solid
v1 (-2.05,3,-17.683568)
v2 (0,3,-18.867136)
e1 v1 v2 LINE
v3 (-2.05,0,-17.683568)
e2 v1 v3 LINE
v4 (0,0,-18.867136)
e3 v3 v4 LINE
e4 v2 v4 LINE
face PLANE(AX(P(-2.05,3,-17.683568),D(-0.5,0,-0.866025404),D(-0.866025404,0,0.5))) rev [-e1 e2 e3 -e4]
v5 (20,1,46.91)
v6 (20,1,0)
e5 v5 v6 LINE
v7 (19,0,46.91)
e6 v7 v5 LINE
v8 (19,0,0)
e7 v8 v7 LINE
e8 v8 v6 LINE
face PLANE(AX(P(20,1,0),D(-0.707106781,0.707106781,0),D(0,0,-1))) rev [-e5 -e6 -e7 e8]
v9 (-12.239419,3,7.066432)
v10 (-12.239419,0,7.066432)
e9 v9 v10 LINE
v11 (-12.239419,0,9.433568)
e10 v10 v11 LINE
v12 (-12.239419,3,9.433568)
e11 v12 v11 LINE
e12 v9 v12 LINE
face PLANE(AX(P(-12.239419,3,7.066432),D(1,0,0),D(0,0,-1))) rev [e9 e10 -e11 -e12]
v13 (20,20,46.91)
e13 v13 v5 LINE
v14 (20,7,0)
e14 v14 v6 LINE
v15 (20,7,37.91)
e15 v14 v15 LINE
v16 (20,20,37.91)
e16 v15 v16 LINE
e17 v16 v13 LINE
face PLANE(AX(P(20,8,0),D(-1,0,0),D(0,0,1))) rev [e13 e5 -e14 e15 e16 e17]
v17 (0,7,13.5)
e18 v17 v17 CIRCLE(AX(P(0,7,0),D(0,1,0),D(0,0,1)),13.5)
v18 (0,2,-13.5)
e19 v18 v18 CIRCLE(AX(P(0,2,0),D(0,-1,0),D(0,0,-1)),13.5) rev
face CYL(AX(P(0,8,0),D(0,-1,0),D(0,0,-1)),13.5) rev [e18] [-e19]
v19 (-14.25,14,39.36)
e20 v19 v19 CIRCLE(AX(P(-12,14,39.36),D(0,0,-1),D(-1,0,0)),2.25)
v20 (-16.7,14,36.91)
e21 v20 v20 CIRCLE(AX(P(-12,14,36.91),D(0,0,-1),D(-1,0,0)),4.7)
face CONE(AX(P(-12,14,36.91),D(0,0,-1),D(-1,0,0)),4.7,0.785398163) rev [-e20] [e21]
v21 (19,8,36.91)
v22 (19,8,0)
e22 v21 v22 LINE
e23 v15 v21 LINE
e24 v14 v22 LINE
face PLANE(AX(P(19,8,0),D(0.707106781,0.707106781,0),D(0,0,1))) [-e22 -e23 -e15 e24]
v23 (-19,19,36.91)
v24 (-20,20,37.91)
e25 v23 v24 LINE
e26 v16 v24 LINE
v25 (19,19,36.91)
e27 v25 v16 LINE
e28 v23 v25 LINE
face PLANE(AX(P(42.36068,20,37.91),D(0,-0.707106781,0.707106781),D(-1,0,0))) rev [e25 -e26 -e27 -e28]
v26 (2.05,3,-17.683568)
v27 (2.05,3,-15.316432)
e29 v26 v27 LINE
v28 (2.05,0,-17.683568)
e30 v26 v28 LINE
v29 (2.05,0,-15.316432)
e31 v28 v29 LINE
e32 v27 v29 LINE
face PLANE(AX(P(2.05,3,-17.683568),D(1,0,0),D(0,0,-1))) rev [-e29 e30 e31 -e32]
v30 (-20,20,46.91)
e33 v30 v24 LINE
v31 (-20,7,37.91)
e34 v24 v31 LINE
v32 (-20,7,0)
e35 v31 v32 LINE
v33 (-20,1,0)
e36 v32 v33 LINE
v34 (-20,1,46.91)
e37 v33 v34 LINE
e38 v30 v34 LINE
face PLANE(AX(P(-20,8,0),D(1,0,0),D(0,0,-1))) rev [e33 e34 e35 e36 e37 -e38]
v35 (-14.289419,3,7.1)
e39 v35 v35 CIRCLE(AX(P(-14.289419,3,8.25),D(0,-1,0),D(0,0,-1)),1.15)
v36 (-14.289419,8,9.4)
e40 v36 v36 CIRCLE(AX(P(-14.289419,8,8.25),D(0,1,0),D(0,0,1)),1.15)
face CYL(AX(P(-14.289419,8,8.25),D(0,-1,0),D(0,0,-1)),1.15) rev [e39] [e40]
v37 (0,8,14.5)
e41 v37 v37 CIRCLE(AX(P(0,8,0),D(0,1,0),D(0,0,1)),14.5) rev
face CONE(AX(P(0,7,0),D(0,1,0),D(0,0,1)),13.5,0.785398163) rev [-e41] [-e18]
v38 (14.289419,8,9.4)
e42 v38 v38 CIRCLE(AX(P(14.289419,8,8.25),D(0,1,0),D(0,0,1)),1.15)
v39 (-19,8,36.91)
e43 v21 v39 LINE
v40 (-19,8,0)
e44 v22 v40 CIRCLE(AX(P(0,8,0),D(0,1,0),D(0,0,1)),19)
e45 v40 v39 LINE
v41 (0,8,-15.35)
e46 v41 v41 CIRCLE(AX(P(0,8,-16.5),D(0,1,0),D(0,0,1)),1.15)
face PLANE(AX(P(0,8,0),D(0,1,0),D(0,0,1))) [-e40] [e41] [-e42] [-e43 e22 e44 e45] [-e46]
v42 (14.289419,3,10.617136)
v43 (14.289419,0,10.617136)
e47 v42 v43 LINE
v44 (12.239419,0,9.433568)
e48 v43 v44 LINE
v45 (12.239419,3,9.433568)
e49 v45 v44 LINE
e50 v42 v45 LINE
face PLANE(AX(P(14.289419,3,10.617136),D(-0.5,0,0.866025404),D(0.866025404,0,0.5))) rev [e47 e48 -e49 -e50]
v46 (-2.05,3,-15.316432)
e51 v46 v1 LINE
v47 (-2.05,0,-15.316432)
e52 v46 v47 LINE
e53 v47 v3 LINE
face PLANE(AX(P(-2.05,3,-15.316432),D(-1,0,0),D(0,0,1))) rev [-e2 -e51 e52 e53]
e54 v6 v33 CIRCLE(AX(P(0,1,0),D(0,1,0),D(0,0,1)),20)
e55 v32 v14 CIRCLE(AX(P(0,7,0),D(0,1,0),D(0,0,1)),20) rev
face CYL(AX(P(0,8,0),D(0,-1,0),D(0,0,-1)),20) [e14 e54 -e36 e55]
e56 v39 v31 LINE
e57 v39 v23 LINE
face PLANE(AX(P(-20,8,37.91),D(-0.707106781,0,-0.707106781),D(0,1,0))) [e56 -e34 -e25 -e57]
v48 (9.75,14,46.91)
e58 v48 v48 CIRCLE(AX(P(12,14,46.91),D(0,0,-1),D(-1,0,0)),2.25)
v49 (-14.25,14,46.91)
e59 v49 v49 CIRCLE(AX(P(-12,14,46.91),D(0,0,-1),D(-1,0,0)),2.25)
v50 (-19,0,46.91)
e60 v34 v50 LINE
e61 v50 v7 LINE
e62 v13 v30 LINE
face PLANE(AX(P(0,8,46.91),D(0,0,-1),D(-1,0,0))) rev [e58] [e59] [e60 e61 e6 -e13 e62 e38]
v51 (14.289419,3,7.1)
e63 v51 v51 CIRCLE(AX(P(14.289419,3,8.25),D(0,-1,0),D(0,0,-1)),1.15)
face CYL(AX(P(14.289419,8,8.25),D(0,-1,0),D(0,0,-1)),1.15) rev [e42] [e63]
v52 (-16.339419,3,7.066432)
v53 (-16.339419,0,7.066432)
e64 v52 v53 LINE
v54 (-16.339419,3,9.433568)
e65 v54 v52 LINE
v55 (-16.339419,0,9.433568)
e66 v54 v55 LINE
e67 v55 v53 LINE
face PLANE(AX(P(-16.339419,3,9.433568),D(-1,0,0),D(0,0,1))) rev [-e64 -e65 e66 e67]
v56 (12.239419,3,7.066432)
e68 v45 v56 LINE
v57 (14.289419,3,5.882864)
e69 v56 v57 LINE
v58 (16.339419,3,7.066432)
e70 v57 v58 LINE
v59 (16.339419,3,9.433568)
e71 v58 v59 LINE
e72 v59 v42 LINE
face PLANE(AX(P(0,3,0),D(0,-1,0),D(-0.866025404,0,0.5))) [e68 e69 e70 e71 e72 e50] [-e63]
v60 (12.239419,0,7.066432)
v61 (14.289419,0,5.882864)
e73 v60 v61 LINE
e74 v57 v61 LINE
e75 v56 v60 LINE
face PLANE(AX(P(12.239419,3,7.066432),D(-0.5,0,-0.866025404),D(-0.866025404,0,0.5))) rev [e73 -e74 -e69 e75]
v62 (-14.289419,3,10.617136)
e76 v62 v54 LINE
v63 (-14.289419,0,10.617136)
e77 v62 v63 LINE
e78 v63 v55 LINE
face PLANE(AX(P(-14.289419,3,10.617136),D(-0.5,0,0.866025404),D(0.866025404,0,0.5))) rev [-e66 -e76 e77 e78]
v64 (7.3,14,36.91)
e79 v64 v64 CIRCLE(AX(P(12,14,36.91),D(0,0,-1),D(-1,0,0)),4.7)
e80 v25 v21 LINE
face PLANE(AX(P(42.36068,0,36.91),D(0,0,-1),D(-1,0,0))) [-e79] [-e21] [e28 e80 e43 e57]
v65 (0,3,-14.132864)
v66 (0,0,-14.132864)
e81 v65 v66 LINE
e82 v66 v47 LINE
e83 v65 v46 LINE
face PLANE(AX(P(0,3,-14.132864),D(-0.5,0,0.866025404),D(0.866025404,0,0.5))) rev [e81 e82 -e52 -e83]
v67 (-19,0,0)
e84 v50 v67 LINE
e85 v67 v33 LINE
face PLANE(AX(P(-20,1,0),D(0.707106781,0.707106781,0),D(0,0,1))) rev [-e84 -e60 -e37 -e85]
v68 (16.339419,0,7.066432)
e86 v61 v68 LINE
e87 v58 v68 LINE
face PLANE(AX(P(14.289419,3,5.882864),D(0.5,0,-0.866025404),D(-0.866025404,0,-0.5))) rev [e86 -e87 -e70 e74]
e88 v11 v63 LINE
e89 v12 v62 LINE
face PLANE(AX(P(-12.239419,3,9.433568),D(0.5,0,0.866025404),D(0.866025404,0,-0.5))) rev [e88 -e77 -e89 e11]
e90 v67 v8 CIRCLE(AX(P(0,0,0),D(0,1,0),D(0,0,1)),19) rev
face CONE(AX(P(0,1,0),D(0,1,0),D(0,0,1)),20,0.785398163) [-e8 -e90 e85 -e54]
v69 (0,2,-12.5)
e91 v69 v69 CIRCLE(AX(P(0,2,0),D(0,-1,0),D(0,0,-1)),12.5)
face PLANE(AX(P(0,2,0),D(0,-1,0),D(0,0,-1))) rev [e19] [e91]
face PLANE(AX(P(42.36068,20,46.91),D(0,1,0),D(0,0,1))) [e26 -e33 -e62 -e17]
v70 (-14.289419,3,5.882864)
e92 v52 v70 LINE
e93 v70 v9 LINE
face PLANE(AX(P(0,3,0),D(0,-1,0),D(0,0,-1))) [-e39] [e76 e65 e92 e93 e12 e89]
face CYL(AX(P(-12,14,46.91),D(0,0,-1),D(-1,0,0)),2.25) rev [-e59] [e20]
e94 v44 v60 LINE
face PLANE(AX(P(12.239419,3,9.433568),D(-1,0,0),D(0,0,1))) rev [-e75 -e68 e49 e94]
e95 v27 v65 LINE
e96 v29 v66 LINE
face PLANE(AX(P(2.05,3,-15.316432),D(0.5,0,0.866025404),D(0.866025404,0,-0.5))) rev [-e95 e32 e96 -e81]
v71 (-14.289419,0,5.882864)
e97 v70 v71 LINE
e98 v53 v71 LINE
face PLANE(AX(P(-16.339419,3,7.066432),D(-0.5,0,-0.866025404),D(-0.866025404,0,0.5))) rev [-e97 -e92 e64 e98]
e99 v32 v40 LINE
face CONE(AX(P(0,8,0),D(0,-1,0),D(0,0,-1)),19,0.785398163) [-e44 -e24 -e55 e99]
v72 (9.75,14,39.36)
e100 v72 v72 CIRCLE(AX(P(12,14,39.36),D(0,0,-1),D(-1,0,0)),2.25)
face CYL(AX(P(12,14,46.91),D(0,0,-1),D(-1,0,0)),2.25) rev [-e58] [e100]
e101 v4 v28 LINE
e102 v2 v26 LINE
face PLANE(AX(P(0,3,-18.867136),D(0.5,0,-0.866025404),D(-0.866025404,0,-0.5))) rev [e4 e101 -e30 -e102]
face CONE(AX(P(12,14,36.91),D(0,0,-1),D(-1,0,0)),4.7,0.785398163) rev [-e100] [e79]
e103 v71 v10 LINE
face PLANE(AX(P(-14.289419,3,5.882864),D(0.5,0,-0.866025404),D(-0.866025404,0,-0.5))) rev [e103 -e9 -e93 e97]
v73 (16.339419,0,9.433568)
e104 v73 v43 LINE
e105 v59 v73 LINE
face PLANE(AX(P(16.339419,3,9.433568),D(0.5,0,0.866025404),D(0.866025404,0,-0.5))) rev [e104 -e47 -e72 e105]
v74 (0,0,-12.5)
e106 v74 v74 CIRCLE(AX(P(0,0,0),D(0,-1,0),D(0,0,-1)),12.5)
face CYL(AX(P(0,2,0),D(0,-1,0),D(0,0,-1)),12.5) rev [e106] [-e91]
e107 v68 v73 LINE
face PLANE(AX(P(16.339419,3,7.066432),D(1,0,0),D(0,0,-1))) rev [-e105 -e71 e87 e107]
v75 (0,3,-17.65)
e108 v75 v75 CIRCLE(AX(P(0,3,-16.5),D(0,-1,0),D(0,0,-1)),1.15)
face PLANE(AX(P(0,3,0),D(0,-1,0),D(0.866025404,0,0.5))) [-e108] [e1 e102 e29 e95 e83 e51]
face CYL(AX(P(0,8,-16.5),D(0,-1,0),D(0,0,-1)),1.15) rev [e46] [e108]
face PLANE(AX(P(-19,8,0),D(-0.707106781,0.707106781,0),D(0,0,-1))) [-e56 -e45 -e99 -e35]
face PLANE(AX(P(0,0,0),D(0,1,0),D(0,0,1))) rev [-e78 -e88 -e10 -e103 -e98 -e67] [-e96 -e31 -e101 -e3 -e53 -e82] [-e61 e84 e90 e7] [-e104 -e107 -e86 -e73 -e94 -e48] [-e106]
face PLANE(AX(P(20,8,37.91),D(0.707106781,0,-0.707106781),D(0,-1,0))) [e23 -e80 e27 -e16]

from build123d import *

# Parameters (mm, degrees)
ESQUISSE1_R                  = 1.15
ESQUISSE1_R_2                = 13.5
BOSS_EXTRU_1_DEPTH           = 8
ESQUISSE2_R                  = 13.5
ESQUISSE2_R_2                = 12.5
BOSS_EXTRU_2_DEPTH           = 2
ENL_V_MAT_EXTRU_1_DEPTH      = 3
R_P_TITION_CIRCULAIRE1_COUNT = 3
ESQUISSE4_W                  = 10
ESQUISSE4_H                  = 20
BOSS_EXTRU_3_DEPTH           = 40
PER_AGEAVANC_1_OUTLINE_R     = 2.25
PER_AGEAVANC_1_DEPTH         = 2.45
PER_AGEAVANC_1_DRAFT         = 45
PER_AGEAVANC_1_2_OUTLINE_R   = 2.25
PER_AGEAVANC_1_2_DEPTH       = 2.45
PER_AGEAVANC_1_2_DRAFT       = 45
ESQUISSE7_R                  = 2.25
ENL_V_MAT_EXTRU_2_DEPTH      = 66.754160325
CHANFREIN1_SIZE              = 1


# Read off the part's stored shape, not the designer's step: PerçageAvancé1
with BuildPart() as part:
    # Esquisse1 → Boss.-Extru.1 (new body)
    with BuildSketch(Plane(origin=(0, 0, 0), x_dir=(1, 0, 0), z_dir=(0, 1, 0))):
        with BuildLine():
            Line((20, -46.91), (20, 0))
            ThreePointArc((20, 0), (0, 20), (-20, 0))
            Line((-20, 0), (-20, -46.91))
            Line((-20, -46.91), (20, -46.91))
        make_face()
        with Locations(Location((0, 16.5, 0), (0, 0, 270))):
            Circle(ESQUISSE1_R, mode=Mode.SUBTRACT)
        with Locations(Location((-14.289419162, -8.25, 0), (0, 0, 270))):
            Circle(ESQUISSE1_R, mode=Mode.SUBTRACT)
        with Locations(Location((0, 0, 0), (0, 0, 270))):
            Circle(ESQUISSE1_R_2, mode=Mode.SUBTRACT)
        with Locations(Location((14.289419162, -8.25, 0), (0, 0, 270))):
            Circle(ESQUISSE1_R, mode=Mode.SUBTRACT)
    extrude(amount=BOSS_EXTRU_1_DEPTH)

    # Esquisse2 → Boss.-Extru.2 (add)
    with BuildSketch(Plane.XZ):
        with Locations(Location((0, 0, 0), (0, 0, 270))):
            Circle(ESQUISSE2_R)
        with Locations(Location((0, 0, 0), (0, 0, 270))):
            Circle(ESQUISSE2_R_2, mode=Mode.SUBTRACT)
    extrude(amount=-BOSS_EXTRU_2_DEPTH)

    # Esquisse3 → Enlèv. mat.-Extru.1 (cut)
    with BuildSketch(Plane.XZ):
        Polygon((-14.289419162, 5.882863896), (-12.239419162, 7.066431948), (-12.239419162, 9.433568052), (-14.289419162, 10.617136104), (-16.339419162, 9.433568052), (-16.339419162, 7.066431948), align=None)
    enl_v_mat_extru_1 = extrude(amount=-ENL_V_MAT_EXTRU_1_DEPTH, mode=Mode.SUBTRACT)

    # Répétition circulaire1: Enlèv. mat.-Extru.1 ×3 about axis
    r_p_tition_circulaire1_axis = Axis((0, 0, 0), (0, 1, 0))
    for i in range(1, R_P_TITION_CIRCULAIRE1_COUNT):
        add(enl_v_mat_extru_1.rotate(r_p_tition_circulaire1_axis, i * 360 / R_P_TITION_CIRCULAIRE1_COUNT), mode=Mode.SUBTRACT)

    # Esquisse4 → Boss.-Extru.3 (add)
    with BuildSketch(Plane.ZY.offset(20)):
        with Locations((41.91, 10)):
            Rectangle(ESQUISSE4_W, ESQUISSE4_H)
    extrude(amount=-BOSS_EXTRU_3_DEPTH)


with BuildPart() as per_ageavanc_1_tool:
    # PerçageAvancé1 outline → PerçageAvancé1 (with draft: the straight prism first)
    with BuildSketch(Plane.XY.offset(39.36)):
        with Locations((-12, 14)):
            Circle(PER_AGEAVANC_1_OUTLINE_R)
    extrude(amount=-PER_AGEAVANC_1_DEPTH)
    # PerçageAvancé1: the draft: its side faces are tilted about the plane it starts from
    per_ageavanc_1_sides = [per_ageavanc_1_tool.faces().sort_by_distance(p)[0] for p in [
        (-14.25, 14, 38.135),
    ]]
    draft(per_ageavanc_1_sides, Plane.XY.offset(39.36), PER_AGEAVANC_1_DRAFT)


with BuildPart() as part_1:
    add(part.part)

    # PerçageAvancé1: cut by per_ageavanc_1_tool
    add(per_ageavanc_1_tool.part, mode=Mode.SUBTRACT)


with BuildPart() as per_ageavanc_1_2_tool:
    # Per_ageAvanc_1 2 outline → Per_ageAvanc_1 2 (with draft: the straight prism first)
    with BuildSketch(Plane.XY.offset(39.36)):
        with Locations((12, 14)):
            Circle(PER_AGEAVANC_1_2_OUTLINE_R)
    extrude(amount=-PER_AGEAVANC_1_2_DEPTH)
    # Per_ageAvanc_1 2: the draft: its side faces are tilted about the plane it starts from
    per_ageavanc_1_2_sides = [per_ageavanc_1_2_tool.faces().sort_by_distance(p)[0] for p in [
        (9.75, 14, 38.135),
    ]]
    draft(per_ageavanc_1_2_sides, Plane.XY.offset(39.36), PER_AGEAVANC_1_2_DRAFT)


with BuildPart() as part_2:
    add(part_1.part)

    # Per_ageAvanc_1 2: cut by per_ageavanc_1_2_tool
    add(per_ageavanc_1_2_tool.part, mode=Mode.SUBTRACT)

    # Esquisse7 → Enlèv. mat.-Extru.2 (cut, through all)
    with BuildSketch(Plane(origin=(0, 0, 39.36), x_dir=(-1, 0, 0), z_dir=(0, 0, -1))):
        with Locations((-12, 14)):
            Circle(ESQUISSE7_R)
        with Locations((12, 14)):
            Circle(ESQUISSE7_R)
    extrude(amount=-ENL_V_MAT_EXTRU_2_DEPTH, mode=Mode.SUBTRACT)

    # Chanfrein1
    chanfrein1_edges = [part_2.edges().sort_by_distance(p)[0] for p in [
        (20, 8, 18.455),
        (20, 14, 36.91),
        (0, 20, 36.91),
        (-20, 14, 36.91),
        (-20, 8, 18.455),
        (0, 8, -20),
        (0, 0, -20),
        (0, 8, -13.5),
        (20, 0, 23.455),
        (-20, 0, 23.455),
    ]]
    chamfer(chanfrein1_edges, length=CHANFREIN1_SIZE)


solid = part_2.part
